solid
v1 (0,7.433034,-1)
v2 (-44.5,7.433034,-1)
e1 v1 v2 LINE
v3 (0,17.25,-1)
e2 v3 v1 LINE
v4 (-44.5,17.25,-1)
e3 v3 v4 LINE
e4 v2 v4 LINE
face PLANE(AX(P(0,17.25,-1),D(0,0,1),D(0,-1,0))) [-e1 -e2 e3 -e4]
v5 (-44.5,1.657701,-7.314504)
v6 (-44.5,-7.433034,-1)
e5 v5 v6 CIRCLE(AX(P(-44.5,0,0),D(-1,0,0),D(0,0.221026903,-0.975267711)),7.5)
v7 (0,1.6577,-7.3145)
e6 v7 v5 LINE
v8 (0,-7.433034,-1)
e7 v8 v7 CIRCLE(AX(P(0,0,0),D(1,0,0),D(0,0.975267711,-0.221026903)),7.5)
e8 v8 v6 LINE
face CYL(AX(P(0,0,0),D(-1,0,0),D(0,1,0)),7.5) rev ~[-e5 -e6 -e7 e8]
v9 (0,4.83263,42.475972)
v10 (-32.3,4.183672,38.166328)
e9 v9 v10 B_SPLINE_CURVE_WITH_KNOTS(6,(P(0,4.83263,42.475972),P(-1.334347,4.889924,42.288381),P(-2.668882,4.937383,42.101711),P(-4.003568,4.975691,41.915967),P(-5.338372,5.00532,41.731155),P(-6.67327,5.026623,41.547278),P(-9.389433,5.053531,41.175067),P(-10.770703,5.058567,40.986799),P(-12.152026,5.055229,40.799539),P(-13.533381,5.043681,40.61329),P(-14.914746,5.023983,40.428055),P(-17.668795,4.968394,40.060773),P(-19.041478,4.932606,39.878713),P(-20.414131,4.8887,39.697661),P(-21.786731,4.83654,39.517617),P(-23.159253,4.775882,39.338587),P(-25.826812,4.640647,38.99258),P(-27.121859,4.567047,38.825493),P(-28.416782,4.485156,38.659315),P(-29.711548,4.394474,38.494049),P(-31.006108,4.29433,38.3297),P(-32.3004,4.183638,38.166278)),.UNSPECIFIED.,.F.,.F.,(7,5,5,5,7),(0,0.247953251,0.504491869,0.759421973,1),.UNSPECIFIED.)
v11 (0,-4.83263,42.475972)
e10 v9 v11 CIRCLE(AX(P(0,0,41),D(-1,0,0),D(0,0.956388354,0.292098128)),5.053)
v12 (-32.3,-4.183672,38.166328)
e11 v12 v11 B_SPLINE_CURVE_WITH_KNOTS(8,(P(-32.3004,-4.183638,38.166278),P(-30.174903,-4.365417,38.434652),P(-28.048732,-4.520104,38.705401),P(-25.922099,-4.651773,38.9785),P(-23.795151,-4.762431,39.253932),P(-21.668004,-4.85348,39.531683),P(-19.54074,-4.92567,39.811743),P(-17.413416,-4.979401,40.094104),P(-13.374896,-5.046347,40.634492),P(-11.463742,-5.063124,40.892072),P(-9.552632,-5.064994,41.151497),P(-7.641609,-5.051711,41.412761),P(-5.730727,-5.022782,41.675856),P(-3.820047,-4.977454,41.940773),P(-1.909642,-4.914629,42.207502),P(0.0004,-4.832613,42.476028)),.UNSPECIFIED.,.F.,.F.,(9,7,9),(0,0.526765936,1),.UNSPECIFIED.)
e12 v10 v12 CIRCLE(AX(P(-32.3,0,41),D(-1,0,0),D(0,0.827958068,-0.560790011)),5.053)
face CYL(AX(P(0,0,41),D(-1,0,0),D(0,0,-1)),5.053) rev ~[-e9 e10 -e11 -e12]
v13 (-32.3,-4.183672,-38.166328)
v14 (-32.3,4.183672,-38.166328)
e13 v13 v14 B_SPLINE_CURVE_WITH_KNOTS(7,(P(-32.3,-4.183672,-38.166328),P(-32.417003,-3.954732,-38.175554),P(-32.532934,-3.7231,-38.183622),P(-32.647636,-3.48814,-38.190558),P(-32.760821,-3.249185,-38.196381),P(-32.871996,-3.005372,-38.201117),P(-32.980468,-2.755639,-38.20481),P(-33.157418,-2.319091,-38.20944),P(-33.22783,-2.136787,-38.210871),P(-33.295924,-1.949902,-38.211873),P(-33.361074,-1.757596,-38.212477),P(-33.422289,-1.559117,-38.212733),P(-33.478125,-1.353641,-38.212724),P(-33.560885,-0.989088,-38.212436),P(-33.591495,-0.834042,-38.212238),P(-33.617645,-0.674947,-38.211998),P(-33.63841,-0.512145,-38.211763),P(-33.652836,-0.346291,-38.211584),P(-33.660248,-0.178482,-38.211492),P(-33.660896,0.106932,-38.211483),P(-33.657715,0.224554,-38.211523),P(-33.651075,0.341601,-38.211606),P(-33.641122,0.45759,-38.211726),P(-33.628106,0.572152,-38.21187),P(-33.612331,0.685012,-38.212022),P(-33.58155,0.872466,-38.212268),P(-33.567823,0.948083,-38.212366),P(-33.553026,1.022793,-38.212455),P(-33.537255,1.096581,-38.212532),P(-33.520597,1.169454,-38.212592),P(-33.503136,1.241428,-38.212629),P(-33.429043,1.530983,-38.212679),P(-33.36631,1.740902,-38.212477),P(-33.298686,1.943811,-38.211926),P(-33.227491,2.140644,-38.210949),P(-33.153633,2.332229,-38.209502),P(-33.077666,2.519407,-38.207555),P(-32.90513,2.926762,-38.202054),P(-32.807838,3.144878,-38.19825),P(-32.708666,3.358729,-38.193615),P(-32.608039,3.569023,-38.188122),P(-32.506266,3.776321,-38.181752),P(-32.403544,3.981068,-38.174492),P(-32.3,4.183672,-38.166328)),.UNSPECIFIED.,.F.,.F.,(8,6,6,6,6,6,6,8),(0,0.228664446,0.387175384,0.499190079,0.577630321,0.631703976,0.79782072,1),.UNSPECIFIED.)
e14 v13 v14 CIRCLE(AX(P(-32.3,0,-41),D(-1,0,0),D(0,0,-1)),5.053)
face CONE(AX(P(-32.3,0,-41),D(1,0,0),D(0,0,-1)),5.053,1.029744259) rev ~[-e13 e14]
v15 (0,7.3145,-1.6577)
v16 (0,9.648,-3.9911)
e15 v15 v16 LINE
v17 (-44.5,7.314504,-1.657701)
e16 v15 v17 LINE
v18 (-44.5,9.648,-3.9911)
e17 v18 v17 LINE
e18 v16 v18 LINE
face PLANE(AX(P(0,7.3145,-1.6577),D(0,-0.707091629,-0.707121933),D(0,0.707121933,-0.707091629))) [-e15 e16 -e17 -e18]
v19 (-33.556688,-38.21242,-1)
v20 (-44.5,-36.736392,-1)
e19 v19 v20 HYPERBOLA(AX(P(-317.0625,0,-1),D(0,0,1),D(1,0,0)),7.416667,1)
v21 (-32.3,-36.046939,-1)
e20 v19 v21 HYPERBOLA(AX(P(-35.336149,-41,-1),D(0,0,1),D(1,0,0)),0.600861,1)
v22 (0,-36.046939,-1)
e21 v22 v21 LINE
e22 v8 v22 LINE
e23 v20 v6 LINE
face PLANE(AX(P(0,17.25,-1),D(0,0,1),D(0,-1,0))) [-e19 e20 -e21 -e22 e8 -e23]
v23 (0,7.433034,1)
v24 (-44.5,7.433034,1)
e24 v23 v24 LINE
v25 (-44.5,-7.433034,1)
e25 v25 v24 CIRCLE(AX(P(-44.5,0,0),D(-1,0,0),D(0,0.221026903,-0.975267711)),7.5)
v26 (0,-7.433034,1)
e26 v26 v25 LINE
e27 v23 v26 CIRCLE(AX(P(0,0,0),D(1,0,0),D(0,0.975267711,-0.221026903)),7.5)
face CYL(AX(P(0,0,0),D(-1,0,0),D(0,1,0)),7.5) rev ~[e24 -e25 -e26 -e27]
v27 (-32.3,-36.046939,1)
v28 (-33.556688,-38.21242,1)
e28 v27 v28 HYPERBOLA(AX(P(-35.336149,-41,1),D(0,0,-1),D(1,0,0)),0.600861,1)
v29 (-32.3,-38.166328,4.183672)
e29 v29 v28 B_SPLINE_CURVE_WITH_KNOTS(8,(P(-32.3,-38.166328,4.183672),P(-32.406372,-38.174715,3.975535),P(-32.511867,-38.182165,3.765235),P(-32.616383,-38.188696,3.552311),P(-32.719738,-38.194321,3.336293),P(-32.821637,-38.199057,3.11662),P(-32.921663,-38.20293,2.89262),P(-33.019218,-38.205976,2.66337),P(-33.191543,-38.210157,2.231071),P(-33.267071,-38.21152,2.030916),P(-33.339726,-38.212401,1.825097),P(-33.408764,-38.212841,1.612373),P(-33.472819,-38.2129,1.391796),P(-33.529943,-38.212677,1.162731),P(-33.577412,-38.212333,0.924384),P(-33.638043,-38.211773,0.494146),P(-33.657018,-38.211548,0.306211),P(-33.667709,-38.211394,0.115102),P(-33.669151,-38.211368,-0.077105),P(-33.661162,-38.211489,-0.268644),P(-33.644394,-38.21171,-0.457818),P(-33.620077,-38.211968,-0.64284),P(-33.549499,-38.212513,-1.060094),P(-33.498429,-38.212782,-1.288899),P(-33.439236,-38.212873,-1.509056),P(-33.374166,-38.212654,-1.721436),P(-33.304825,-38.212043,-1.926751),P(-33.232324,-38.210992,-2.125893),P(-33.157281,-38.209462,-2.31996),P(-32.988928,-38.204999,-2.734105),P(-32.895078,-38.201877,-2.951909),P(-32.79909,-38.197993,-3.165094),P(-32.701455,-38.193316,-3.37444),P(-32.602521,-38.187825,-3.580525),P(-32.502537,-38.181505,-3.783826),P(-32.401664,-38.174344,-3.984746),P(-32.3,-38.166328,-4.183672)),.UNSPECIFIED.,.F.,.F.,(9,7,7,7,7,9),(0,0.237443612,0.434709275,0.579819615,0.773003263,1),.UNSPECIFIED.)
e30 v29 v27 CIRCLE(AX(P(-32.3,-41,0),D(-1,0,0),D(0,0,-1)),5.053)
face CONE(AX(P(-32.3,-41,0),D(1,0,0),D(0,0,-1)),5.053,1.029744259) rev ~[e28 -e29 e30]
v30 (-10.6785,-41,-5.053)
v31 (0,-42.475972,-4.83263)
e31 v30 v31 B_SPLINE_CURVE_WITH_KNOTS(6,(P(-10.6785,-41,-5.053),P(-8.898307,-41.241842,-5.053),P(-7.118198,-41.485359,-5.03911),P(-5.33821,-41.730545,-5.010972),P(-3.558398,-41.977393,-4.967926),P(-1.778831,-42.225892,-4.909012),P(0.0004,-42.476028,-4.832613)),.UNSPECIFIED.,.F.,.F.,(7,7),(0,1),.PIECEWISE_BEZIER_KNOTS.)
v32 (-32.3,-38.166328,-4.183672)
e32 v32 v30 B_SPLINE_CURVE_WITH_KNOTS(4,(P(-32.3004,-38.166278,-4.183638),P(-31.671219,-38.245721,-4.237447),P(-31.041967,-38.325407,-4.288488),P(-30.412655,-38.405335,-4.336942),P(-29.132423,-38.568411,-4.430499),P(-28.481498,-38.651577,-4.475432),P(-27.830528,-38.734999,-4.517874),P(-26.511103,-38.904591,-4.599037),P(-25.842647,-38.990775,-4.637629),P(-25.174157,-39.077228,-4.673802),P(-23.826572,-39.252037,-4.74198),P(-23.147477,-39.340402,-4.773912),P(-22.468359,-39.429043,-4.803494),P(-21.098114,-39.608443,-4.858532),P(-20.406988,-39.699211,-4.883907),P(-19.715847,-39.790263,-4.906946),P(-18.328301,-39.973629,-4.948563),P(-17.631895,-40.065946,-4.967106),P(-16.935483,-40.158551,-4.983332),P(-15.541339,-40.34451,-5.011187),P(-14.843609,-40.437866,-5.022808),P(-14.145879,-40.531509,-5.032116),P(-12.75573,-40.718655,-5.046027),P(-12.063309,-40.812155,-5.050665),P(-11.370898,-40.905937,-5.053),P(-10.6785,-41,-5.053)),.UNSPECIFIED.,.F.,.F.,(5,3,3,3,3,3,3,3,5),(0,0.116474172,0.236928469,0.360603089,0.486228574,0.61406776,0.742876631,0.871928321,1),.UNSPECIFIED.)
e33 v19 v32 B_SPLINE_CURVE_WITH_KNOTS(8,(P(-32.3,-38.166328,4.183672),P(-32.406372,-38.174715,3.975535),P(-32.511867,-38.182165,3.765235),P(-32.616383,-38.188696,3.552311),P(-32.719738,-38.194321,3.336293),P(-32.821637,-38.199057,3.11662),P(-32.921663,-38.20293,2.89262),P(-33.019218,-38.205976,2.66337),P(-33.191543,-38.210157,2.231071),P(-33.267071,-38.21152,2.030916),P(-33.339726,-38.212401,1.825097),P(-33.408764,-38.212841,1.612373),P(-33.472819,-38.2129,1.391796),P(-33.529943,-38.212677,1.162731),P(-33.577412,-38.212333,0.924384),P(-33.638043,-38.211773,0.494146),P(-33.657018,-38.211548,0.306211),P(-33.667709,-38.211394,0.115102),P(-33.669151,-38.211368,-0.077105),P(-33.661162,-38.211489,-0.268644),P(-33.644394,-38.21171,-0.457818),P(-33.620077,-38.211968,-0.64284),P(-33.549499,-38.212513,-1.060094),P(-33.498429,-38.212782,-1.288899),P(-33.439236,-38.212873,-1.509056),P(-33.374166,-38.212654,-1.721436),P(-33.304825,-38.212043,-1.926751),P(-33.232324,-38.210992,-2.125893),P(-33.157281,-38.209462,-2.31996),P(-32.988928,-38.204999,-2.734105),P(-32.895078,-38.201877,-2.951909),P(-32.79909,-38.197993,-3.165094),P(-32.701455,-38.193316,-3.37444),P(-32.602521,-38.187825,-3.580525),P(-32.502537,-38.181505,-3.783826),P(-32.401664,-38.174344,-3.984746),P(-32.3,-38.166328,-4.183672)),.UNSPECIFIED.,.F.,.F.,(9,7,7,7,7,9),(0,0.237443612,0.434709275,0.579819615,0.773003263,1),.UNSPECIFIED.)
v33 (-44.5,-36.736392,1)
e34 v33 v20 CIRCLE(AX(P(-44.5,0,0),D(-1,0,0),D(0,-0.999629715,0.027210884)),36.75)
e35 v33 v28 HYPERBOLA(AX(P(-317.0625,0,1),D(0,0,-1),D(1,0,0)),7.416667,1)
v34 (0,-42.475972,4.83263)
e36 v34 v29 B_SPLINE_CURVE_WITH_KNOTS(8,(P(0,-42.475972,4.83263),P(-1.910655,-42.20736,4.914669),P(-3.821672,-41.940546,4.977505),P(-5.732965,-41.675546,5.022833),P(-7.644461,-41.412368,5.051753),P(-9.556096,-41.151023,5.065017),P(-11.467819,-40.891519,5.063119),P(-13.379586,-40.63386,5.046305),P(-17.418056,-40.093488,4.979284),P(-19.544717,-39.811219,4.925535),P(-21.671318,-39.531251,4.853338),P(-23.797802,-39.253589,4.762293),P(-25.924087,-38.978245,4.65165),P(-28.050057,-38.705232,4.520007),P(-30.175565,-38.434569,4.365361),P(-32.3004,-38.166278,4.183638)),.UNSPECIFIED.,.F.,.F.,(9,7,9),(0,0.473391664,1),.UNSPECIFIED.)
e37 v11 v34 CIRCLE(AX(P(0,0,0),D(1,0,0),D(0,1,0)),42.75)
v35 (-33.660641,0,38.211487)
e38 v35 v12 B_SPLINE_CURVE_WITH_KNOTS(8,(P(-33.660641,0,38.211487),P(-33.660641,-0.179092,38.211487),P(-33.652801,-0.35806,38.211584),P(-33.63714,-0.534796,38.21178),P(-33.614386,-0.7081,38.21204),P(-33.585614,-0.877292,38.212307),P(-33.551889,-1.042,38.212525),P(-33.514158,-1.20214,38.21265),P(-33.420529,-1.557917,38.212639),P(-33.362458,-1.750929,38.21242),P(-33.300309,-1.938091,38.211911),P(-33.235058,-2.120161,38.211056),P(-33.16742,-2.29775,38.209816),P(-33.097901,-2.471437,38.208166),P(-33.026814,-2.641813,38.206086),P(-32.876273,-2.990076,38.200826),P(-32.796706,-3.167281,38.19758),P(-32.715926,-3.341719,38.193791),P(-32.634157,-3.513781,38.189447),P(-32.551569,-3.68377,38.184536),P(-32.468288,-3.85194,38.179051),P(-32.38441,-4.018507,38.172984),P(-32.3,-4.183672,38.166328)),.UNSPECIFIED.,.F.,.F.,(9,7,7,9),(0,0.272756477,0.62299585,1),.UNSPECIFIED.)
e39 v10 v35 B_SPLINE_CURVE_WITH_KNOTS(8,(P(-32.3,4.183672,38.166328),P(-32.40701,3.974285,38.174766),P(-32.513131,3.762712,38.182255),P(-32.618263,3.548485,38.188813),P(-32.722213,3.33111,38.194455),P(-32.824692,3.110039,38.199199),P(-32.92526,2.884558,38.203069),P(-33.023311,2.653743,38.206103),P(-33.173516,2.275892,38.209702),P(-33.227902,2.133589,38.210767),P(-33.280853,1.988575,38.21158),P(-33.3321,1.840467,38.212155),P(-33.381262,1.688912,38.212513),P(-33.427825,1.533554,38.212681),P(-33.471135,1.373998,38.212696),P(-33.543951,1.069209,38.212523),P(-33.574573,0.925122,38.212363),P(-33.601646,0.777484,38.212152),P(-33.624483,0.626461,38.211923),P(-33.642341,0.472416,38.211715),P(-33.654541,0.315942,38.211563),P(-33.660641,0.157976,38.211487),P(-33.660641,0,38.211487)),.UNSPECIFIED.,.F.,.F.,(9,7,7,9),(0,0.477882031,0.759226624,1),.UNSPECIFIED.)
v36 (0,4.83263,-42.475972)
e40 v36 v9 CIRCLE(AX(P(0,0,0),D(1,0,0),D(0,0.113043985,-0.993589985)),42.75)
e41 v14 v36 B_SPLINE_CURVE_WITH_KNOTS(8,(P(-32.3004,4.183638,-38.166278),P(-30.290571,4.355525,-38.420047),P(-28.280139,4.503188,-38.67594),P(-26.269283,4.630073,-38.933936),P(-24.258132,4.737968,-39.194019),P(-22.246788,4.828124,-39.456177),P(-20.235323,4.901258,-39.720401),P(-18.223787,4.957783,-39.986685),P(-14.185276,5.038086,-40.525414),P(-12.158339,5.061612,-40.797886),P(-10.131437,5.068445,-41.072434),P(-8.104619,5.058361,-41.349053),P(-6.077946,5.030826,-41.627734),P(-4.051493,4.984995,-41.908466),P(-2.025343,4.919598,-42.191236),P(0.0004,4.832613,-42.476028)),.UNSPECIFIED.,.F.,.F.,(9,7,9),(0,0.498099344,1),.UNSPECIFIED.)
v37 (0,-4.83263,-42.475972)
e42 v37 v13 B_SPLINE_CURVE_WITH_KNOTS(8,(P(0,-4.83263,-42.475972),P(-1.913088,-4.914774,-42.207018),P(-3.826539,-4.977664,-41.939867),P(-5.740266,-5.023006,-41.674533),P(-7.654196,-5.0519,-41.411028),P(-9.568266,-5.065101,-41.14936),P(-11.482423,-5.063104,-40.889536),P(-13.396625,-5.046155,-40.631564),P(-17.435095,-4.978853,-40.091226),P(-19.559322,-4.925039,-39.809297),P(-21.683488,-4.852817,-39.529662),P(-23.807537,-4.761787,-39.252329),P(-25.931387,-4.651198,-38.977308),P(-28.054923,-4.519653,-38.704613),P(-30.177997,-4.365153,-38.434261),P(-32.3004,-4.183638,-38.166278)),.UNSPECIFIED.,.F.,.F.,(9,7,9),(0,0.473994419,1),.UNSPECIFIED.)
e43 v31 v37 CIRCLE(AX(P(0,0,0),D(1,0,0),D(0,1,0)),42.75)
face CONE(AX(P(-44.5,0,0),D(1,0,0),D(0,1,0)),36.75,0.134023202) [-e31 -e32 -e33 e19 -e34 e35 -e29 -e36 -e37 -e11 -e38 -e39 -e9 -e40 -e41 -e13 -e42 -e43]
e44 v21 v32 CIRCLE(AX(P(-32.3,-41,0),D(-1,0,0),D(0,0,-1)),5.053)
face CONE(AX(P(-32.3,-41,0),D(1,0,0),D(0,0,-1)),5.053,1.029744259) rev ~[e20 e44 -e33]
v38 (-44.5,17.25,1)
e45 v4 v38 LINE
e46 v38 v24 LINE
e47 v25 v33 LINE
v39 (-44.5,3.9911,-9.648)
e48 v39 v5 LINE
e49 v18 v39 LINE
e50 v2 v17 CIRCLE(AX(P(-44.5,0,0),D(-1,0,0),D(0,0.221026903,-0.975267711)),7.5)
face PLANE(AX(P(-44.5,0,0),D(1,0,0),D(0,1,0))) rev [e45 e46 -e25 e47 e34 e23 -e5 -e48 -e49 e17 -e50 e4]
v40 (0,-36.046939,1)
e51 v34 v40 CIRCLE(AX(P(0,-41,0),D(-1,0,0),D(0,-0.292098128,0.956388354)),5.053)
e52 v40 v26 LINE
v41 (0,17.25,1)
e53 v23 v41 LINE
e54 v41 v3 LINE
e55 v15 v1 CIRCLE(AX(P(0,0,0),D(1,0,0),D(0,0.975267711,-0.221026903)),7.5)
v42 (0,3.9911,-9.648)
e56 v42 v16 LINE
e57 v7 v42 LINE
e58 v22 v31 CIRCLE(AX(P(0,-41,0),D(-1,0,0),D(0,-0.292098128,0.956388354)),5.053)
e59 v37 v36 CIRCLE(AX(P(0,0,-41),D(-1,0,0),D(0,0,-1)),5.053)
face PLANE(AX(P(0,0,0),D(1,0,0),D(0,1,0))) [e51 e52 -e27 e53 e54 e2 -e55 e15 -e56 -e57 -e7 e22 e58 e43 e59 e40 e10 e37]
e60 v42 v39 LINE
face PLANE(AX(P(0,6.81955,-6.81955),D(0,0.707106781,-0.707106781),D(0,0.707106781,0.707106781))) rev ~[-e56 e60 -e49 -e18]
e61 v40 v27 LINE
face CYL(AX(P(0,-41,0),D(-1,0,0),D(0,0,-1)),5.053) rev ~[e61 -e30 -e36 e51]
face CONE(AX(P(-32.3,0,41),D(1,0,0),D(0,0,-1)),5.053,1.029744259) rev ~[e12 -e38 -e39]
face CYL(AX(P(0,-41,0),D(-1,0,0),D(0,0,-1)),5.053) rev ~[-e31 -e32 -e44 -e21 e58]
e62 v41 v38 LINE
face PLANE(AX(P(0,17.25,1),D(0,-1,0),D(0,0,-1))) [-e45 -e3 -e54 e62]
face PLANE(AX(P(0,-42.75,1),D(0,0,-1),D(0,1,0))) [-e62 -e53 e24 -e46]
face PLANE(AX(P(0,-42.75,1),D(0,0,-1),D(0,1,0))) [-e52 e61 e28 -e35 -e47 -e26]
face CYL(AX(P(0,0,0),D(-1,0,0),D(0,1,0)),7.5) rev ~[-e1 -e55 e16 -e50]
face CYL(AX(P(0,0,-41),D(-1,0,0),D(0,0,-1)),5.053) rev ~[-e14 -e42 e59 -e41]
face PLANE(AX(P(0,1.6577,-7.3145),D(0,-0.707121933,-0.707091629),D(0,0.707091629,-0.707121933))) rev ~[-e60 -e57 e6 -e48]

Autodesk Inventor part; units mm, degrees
ref_plane "YZ Plane" through (0, 0, 0) normal (1, 0, 0) x (0, 1, 0)
ref_plane "XZ Plane" through (0, 0, 0) normal (0, 1, 0) x (-1, 0, 0)
ref_plane "XY Plane" through (0, 0, 0) normal (0, 0, 1) x (1, 0, 0)
sketch "Esquisse1" plane through (0, 0, 0) normal (0, 0, 1) x (1, 0, 0)
  line L0 (-36.1898, 0) -> (37.2521, 0)
  line L1 (0, 7.5) -> (-44.5, 7.5)
  line L2 (-44.5, 7.5) -> (-44.5, 36.75)
  line L3 (-44.5, 36.75) -> (0, 42.75)
  line L4 (0, 42.75) -> (0, 7.5)
  point P0 (0, 0)
  dimension "d0" = 15
  dimension "d1" = 85.5
  dimension "d2" = 0
  dimension "d3" = 73.5
  dimension "d4" = 44.5
  dimension "d5" = 0
revolve "Révolution1" add sketch "Esquisse1" angle 360 about axis through (-36.1898, 0, 0) along (1, 0, 0)
sketch "Esquisse3" plane through (0, 0, 0) normal (1, 0, 0) x (0, 0, -1)
  circle A0 centre (0, 0) radius 41
  circle A1 centre (0, 0) radius 7.5 projected
  line L0 (0, 0) -> (-59.2945, 0)
  line L1 (0, 0) -> (0, -53.2291)
  line L2 (0, 0) -> (55.0659, 0)
  point P0 (0, -41)
  point P1 (41, 0)
  point P2 (-41, 0)
  dimension "d16" = 82
hole "Perçage1" at (0, -41, 0) at (0, 0, 41) at (0, 0, -41) direction (-1, 0, 0) diameter 10.106 depth 32.3 tip angle 118 thread size "M12x1.75" class "6H" standard "ANSI Metric M Profile"
sketch "Esquisse4" plane through (0, 0, 0) normal (1, 0, 0) x (0, 0, 1)
  line L0 (0, 0) -> (-39.036, -39.036)
  line L1 (0, 0) -> (-55.3193, 0)
  circle A0 centre (0, 0) radius 7.5 projected
  line L2 (-1.6577, -7.3145) -> (-3.9911, -9.648)
  line L3 (-7.3145, -1.6577) -> (-9.648, -3.9911)
  line L4 (-9.648, -3.9911) -> (-3.9911, -9.648)
  dimension "d17" = 45
  dimension "d20" = 3.3
  dimension "d21" = 3.3
  dimension "d22" = 4
  dimension "d23" = 4
extrude "Extrusion1" cut sketch "Esquisse4" against normal through all contours A0 L2 L4 L0 | L0 L4 L3 A0
sketch "Esquisse5" plane through (0, 0, 0) normal (1, 0, 0) x (0, 0, 1)
  line L0 (-1, 42.75) -> (1, 42.75)
  line L1 (1, 42.75) -> (1, -17.25)
  line L2 (1, -17.25) -> (-1, -17.25)
  line L3 (-1, -17.25) -> (-1, 42.75)
  line L4 (-1, 42.75) -> (1, -17.25) construction
  line L5 (1, 42.75) -> (-1, -17.25) construction
  arc A0 (-4.8326, 42.476) -> (4.8326, 42.476) centre (0, 0) ccw projected
  point P0 (0, 12.75)
  point P1 (42.6948, 2.1722)
  point P2 (-42.6948, 2.1722)
  point P3 (4.9266, -42.4652)
  point P4 (42.5102, -4.5219)
  dimension "d26" = 2
  dimension "d27" = 60
  dimension "d28" = 0
extrude "Extrusion2" cut sketch "Esquisse5" against normal through all
properties part number "Douille2517"
